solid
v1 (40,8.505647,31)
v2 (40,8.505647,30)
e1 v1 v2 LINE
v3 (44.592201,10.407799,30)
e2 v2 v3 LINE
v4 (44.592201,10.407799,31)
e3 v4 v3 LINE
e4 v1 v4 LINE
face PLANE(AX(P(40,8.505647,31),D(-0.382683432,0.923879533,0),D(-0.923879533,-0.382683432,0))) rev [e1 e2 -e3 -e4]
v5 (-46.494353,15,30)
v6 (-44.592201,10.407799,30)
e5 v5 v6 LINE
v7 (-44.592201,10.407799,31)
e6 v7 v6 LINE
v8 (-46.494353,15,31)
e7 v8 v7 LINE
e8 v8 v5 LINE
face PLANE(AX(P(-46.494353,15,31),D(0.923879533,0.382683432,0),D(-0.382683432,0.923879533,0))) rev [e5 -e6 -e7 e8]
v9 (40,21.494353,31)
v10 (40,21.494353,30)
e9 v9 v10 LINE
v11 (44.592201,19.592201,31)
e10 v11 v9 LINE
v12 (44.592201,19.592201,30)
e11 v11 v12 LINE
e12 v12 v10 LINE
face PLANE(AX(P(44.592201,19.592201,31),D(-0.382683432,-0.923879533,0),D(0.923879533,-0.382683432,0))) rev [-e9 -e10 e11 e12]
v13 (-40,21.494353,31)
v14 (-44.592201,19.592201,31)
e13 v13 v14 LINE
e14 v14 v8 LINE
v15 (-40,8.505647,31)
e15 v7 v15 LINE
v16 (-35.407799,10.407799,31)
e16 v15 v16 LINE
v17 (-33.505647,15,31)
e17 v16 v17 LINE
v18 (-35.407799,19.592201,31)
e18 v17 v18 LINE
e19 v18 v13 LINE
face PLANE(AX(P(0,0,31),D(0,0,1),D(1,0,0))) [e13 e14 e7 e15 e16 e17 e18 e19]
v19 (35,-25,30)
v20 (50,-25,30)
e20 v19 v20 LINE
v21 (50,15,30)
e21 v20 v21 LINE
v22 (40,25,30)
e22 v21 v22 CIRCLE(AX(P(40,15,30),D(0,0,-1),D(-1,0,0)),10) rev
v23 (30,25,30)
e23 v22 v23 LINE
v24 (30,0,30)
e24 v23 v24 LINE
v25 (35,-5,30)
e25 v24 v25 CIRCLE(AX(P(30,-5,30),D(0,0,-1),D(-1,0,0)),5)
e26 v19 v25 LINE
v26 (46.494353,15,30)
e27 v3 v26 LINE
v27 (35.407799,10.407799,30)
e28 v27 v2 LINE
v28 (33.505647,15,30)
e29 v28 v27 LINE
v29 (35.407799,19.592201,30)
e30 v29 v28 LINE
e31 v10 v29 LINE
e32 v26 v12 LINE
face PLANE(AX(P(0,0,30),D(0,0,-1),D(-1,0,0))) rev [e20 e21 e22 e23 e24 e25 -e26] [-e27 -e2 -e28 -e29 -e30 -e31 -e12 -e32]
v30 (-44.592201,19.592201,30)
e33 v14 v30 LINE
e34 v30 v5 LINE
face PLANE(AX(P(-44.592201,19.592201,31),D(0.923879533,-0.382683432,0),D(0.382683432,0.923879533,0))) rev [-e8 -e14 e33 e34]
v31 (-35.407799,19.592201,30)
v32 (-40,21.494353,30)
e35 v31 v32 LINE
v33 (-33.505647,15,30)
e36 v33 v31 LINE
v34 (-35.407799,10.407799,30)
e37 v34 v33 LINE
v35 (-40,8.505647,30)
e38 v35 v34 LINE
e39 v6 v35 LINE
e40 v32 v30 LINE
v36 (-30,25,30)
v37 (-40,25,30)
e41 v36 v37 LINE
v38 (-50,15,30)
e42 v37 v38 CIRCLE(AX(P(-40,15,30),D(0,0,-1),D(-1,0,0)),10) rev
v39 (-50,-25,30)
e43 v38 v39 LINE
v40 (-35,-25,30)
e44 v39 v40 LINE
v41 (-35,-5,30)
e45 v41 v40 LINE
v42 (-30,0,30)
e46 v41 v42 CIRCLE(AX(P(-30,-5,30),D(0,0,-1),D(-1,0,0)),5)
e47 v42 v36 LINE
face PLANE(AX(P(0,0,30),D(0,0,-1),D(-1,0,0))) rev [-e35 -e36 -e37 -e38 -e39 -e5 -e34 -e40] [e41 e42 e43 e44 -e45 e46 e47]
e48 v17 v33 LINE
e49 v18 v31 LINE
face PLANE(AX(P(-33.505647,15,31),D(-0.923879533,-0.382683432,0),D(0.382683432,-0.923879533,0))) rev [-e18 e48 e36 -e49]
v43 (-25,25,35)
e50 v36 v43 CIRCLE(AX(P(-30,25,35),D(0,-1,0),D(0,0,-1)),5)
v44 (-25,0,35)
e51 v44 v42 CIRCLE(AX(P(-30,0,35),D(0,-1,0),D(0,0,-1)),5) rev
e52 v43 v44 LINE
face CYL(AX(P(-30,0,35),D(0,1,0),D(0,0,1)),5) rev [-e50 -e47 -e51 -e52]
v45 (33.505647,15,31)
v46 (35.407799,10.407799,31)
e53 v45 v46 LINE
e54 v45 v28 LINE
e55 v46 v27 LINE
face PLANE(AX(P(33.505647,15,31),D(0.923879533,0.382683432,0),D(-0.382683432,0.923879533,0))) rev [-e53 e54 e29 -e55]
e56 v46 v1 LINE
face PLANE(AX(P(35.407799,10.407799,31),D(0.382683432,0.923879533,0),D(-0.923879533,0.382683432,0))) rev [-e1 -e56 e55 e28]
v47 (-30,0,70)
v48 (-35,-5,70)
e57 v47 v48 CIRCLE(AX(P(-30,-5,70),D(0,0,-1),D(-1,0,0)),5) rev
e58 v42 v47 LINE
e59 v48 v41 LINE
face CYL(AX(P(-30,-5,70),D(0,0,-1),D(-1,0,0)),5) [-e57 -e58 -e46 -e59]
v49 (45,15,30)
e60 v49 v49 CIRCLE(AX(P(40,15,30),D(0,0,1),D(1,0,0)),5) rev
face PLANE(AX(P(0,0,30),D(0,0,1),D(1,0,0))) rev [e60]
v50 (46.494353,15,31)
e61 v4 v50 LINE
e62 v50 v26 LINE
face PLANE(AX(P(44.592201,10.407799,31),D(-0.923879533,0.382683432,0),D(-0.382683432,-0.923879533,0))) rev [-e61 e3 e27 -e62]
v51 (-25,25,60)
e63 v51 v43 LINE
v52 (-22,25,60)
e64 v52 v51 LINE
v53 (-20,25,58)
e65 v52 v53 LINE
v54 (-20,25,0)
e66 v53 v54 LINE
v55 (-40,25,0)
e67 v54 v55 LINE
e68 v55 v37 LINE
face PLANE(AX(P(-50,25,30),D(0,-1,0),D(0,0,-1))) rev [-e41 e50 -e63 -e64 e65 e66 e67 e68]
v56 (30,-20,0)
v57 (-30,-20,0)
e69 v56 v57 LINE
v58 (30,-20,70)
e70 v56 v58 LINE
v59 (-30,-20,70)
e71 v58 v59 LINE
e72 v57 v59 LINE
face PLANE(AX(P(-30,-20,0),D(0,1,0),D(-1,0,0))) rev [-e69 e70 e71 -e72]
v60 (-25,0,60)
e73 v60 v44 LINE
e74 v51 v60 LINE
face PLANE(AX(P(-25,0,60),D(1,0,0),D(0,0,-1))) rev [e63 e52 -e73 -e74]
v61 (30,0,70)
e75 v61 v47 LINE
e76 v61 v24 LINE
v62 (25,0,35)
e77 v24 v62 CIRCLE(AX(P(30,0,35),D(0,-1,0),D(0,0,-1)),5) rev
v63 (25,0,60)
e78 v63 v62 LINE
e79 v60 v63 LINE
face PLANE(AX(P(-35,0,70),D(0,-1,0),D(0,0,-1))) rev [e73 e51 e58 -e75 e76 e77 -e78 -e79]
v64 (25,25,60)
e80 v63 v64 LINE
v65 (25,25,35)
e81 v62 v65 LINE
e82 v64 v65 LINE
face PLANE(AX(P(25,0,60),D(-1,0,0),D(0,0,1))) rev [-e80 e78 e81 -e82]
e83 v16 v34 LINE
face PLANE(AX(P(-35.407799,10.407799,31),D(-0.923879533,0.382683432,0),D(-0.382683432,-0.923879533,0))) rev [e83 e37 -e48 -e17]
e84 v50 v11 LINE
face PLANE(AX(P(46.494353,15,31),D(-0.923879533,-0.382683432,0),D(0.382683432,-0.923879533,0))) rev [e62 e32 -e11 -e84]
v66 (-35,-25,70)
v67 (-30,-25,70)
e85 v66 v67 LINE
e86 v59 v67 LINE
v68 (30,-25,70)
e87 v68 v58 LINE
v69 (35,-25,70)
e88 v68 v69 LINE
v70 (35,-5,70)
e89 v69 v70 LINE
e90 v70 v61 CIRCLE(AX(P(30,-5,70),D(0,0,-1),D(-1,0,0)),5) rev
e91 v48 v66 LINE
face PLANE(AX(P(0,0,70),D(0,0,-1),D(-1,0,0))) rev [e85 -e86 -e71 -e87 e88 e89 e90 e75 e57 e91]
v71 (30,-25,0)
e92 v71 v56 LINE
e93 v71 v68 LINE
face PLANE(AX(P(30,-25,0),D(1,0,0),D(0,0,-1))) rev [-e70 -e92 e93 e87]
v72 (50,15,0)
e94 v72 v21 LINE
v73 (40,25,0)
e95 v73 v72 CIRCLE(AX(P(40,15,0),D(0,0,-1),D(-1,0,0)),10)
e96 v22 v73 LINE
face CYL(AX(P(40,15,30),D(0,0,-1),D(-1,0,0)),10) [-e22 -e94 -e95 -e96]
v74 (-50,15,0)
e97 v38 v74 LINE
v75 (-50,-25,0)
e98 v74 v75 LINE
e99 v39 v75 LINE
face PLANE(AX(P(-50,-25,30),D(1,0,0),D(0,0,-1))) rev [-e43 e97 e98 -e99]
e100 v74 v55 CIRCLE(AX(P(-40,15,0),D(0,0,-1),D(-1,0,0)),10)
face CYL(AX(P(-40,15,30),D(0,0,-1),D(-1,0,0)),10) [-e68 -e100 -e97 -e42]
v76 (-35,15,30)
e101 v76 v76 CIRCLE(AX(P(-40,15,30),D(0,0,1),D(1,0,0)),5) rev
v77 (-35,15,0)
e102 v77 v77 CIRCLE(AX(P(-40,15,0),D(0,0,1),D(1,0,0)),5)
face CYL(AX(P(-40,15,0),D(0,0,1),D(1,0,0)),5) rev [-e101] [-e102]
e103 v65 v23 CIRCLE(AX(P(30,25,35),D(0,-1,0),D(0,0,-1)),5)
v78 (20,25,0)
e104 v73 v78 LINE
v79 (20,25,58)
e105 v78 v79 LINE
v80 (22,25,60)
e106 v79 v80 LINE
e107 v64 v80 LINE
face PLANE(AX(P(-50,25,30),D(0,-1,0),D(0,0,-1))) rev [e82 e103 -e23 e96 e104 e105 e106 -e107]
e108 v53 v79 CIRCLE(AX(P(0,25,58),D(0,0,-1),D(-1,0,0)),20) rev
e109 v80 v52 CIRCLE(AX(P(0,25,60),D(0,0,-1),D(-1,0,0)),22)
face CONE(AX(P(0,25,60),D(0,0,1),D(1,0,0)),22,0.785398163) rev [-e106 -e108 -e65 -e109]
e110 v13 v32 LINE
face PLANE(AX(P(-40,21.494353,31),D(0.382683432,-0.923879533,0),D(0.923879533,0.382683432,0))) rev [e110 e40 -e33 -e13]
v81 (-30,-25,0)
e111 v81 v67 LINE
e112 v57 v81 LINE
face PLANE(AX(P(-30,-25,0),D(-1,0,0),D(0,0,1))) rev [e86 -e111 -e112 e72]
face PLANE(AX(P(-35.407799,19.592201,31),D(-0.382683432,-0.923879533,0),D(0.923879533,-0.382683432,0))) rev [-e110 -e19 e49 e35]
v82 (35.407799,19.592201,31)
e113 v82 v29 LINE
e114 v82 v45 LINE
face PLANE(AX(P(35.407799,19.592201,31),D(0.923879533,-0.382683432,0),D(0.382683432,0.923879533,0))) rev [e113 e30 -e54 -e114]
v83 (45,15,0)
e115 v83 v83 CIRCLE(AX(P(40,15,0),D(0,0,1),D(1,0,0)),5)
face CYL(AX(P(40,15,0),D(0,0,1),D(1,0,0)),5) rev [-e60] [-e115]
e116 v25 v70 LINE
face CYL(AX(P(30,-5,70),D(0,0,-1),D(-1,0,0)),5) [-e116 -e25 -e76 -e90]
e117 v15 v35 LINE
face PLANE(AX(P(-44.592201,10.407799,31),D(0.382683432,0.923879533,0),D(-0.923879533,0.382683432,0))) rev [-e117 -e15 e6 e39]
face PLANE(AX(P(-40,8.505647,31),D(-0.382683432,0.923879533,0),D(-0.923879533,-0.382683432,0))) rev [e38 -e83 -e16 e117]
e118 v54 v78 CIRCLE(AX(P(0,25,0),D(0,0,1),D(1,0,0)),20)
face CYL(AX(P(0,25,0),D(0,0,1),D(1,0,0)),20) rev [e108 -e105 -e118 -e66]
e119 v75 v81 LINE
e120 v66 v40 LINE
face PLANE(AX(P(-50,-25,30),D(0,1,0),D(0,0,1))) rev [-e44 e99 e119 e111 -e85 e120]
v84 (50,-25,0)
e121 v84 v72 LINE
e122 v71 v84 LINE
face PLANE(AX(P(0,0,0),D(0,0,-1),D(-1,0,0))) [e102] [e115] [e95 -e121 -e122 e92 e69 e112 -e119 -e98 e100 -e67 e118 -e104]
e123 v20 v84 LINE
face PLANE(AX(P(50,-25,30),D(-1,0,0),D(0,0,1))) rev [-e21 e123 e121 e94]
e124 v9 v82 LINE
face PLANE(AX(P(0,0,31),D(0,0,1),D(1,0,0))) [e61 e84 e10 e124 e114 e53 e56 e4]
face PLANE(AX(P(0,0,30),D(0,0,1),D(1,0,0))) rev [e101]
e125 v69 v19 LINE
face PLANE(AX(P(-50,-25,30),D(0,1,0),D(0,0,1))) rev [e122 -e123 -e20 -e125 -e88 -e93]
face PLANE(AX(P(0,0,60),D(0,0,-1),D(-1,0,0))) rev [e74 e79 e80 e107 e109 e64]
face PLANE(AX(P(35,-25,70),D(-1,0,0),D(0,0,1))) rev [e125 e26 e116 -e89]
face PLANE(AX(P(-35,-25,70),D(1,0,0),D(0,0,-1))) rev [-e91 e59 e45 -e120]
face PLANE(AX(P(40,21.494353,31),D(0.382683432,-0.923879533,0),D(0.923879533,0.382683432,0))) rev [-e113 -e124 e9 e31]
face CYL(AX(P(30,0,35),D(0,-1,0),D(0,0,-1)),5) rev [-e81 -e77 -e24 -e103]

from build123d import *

# Parameters (mm, degrees)
CROQUIS1_W              = 100
CROQUIS1_H              = 50
SALIENTE_EXTRUIR1_DEPTH = 30
CROQUIS2_W              = 70
CROQUIS2_H              = 25
SALIENTE_EXTRUIR2_DEPTH = 40
CROQUIS3_W              = 50
CROQUIS3_H              = 25
SALIENTE_EXTRUIR3_DEPTH = 30
CROQUIS4_R              = 20
CORTAR_EXTRUIR1_DEPTH   = 83.006097334
CHAFL_N1_SIZE           = 2
CROQUIS5_W              = 60
CROQUIS5_H              = 5
CORTAR_EXTRUIR2_DEPTH   = 90.582364336
REDONDEO1_R             = 10
REDONDEO2_R             = 5
CROQUIS6_R              = 5
CORTAR_EXTRUIR3_DEPTH   = 69.738635424
SALIENTE_EXTRUIR4_DEPTH = 1


with BuildPart() as part:
    # Croquis1 → Saliente-Extruir1 (new body)
    with BuildSketch(Plane.XY):
        Rectangle(CROQUIS1_W, CROQUIS1_H)
    extrude(amount=SALIENTE_EXTRUIR1_DEPTH)

    # Croquis2 → Saliente-Extruir2 (add)
    with BuildSketch(Plane.XY.offset(30)):
        with Locations((0, -12.5)):
            Rectangle(CROQUIS2_W, CROQUIS2_H)
    extrude(amount=SALIENTE_EXTRUIR2_DEPTH)

    # Croquis3 → Saliente-Extruir3 (add)
    with BuildSketch(Plane.XY.offset(30)):
        with Locations((0, 12.5)):
            Rectangle(CROQUIS3_W, CROQUIS3_H)
    extrude(amount=SALIENTE_EXTRUIR3_DEPTH)

    # Croquis4 → Cortar-Extruir1 (cut, through all)
    with BuildSketch(Plane.XY.offset(60)):
        with Locations((0, 25)):
            Circle(CROQUIS4_R)
    extrude(amount=-CORTAR_EXTRUIR1_DEPTH, mode=Mode.SUBTRACT)

    # Chaflán1
    chafl_n1_edges = [part.edges().sort_by_distance(p)[0] for p in [
        (0, 5, 60),
    ]]
    chamfer(chafl_n1_edges, length=CHAFL_N1_SIZE)

    # Croquis5 → Cortar-Extruir2 (cut, through all)
    with BuildSketch(Plane.XY.offset(70)):
        with Locations((0, -22.5)):
            Rectangle(CROQUIS5_W, CROQUIS5_H)
    extrude(amount=-CORTAR_EXTRUIR2_DEPTH, mode=Mode.SUBTRACT)

    # Redondeo1
    redondeo1_edges = [part.edges().sort_by_distance(p)[0] for p in [
        (-50, 25, 15),
        (50, 25, 15),
    ]]
    fillet(redondeo1_edges, radius=REDONDEO1_R)

    # Redondeo2
    redondeo2_edges = [part.edges().sort_by_distance(p)[0] for p in [
        (-35, 0, 50),
        (35, 0, 50),
        (-25, 12.5, 30),
        (25, 12.5, 30),
    ]]
    fillet(redondeo2_edges, radius=REDONDEO2_R - 0.0001)  # a hair under: the kernel refuses the full size

    # Croquis6 → Cortar-Extruir3 (cut, through all)
    with BuildSketch(Plane.XY.offset(30)):
        with Locations((-40, 15)):
            Circle(CROQUIS6_R)
        with Locations((40, 15)):
            Circle(CROQUIS6_R)
    extrude(amount=-CORTAR_EXTRUIR3_DEPTH, mode=Mode.SUBTRACT)

    # Croquis9 → Saliente-Extruir4 (add)
    with BuildSketch(Plane.XY.offset(30)):
        Polygon((-40, 21.494353202), (-44.592201188, 19.592201188), (-46.494353202, 15), (-44.592201188, 10.407798812), (-40, 8.505646798), (-35.407798812, 10.407798812), (-33.505646798, 15), (-35.407798812, 19.592201188), align=None)
        Polygon((40, 21.494353202), (35.407798812, 19.592201188), (33.505646798, 15), (35.407798812, 10.407798812), (40, 8.505646798), (44.592201188, 10.407798812), (46.494353202, 15), (44.592201188, 19.592201188), align=None)
    extrude(amount=SALIENTE_EXTRUIR4_DEPTH)


solid = part.part
